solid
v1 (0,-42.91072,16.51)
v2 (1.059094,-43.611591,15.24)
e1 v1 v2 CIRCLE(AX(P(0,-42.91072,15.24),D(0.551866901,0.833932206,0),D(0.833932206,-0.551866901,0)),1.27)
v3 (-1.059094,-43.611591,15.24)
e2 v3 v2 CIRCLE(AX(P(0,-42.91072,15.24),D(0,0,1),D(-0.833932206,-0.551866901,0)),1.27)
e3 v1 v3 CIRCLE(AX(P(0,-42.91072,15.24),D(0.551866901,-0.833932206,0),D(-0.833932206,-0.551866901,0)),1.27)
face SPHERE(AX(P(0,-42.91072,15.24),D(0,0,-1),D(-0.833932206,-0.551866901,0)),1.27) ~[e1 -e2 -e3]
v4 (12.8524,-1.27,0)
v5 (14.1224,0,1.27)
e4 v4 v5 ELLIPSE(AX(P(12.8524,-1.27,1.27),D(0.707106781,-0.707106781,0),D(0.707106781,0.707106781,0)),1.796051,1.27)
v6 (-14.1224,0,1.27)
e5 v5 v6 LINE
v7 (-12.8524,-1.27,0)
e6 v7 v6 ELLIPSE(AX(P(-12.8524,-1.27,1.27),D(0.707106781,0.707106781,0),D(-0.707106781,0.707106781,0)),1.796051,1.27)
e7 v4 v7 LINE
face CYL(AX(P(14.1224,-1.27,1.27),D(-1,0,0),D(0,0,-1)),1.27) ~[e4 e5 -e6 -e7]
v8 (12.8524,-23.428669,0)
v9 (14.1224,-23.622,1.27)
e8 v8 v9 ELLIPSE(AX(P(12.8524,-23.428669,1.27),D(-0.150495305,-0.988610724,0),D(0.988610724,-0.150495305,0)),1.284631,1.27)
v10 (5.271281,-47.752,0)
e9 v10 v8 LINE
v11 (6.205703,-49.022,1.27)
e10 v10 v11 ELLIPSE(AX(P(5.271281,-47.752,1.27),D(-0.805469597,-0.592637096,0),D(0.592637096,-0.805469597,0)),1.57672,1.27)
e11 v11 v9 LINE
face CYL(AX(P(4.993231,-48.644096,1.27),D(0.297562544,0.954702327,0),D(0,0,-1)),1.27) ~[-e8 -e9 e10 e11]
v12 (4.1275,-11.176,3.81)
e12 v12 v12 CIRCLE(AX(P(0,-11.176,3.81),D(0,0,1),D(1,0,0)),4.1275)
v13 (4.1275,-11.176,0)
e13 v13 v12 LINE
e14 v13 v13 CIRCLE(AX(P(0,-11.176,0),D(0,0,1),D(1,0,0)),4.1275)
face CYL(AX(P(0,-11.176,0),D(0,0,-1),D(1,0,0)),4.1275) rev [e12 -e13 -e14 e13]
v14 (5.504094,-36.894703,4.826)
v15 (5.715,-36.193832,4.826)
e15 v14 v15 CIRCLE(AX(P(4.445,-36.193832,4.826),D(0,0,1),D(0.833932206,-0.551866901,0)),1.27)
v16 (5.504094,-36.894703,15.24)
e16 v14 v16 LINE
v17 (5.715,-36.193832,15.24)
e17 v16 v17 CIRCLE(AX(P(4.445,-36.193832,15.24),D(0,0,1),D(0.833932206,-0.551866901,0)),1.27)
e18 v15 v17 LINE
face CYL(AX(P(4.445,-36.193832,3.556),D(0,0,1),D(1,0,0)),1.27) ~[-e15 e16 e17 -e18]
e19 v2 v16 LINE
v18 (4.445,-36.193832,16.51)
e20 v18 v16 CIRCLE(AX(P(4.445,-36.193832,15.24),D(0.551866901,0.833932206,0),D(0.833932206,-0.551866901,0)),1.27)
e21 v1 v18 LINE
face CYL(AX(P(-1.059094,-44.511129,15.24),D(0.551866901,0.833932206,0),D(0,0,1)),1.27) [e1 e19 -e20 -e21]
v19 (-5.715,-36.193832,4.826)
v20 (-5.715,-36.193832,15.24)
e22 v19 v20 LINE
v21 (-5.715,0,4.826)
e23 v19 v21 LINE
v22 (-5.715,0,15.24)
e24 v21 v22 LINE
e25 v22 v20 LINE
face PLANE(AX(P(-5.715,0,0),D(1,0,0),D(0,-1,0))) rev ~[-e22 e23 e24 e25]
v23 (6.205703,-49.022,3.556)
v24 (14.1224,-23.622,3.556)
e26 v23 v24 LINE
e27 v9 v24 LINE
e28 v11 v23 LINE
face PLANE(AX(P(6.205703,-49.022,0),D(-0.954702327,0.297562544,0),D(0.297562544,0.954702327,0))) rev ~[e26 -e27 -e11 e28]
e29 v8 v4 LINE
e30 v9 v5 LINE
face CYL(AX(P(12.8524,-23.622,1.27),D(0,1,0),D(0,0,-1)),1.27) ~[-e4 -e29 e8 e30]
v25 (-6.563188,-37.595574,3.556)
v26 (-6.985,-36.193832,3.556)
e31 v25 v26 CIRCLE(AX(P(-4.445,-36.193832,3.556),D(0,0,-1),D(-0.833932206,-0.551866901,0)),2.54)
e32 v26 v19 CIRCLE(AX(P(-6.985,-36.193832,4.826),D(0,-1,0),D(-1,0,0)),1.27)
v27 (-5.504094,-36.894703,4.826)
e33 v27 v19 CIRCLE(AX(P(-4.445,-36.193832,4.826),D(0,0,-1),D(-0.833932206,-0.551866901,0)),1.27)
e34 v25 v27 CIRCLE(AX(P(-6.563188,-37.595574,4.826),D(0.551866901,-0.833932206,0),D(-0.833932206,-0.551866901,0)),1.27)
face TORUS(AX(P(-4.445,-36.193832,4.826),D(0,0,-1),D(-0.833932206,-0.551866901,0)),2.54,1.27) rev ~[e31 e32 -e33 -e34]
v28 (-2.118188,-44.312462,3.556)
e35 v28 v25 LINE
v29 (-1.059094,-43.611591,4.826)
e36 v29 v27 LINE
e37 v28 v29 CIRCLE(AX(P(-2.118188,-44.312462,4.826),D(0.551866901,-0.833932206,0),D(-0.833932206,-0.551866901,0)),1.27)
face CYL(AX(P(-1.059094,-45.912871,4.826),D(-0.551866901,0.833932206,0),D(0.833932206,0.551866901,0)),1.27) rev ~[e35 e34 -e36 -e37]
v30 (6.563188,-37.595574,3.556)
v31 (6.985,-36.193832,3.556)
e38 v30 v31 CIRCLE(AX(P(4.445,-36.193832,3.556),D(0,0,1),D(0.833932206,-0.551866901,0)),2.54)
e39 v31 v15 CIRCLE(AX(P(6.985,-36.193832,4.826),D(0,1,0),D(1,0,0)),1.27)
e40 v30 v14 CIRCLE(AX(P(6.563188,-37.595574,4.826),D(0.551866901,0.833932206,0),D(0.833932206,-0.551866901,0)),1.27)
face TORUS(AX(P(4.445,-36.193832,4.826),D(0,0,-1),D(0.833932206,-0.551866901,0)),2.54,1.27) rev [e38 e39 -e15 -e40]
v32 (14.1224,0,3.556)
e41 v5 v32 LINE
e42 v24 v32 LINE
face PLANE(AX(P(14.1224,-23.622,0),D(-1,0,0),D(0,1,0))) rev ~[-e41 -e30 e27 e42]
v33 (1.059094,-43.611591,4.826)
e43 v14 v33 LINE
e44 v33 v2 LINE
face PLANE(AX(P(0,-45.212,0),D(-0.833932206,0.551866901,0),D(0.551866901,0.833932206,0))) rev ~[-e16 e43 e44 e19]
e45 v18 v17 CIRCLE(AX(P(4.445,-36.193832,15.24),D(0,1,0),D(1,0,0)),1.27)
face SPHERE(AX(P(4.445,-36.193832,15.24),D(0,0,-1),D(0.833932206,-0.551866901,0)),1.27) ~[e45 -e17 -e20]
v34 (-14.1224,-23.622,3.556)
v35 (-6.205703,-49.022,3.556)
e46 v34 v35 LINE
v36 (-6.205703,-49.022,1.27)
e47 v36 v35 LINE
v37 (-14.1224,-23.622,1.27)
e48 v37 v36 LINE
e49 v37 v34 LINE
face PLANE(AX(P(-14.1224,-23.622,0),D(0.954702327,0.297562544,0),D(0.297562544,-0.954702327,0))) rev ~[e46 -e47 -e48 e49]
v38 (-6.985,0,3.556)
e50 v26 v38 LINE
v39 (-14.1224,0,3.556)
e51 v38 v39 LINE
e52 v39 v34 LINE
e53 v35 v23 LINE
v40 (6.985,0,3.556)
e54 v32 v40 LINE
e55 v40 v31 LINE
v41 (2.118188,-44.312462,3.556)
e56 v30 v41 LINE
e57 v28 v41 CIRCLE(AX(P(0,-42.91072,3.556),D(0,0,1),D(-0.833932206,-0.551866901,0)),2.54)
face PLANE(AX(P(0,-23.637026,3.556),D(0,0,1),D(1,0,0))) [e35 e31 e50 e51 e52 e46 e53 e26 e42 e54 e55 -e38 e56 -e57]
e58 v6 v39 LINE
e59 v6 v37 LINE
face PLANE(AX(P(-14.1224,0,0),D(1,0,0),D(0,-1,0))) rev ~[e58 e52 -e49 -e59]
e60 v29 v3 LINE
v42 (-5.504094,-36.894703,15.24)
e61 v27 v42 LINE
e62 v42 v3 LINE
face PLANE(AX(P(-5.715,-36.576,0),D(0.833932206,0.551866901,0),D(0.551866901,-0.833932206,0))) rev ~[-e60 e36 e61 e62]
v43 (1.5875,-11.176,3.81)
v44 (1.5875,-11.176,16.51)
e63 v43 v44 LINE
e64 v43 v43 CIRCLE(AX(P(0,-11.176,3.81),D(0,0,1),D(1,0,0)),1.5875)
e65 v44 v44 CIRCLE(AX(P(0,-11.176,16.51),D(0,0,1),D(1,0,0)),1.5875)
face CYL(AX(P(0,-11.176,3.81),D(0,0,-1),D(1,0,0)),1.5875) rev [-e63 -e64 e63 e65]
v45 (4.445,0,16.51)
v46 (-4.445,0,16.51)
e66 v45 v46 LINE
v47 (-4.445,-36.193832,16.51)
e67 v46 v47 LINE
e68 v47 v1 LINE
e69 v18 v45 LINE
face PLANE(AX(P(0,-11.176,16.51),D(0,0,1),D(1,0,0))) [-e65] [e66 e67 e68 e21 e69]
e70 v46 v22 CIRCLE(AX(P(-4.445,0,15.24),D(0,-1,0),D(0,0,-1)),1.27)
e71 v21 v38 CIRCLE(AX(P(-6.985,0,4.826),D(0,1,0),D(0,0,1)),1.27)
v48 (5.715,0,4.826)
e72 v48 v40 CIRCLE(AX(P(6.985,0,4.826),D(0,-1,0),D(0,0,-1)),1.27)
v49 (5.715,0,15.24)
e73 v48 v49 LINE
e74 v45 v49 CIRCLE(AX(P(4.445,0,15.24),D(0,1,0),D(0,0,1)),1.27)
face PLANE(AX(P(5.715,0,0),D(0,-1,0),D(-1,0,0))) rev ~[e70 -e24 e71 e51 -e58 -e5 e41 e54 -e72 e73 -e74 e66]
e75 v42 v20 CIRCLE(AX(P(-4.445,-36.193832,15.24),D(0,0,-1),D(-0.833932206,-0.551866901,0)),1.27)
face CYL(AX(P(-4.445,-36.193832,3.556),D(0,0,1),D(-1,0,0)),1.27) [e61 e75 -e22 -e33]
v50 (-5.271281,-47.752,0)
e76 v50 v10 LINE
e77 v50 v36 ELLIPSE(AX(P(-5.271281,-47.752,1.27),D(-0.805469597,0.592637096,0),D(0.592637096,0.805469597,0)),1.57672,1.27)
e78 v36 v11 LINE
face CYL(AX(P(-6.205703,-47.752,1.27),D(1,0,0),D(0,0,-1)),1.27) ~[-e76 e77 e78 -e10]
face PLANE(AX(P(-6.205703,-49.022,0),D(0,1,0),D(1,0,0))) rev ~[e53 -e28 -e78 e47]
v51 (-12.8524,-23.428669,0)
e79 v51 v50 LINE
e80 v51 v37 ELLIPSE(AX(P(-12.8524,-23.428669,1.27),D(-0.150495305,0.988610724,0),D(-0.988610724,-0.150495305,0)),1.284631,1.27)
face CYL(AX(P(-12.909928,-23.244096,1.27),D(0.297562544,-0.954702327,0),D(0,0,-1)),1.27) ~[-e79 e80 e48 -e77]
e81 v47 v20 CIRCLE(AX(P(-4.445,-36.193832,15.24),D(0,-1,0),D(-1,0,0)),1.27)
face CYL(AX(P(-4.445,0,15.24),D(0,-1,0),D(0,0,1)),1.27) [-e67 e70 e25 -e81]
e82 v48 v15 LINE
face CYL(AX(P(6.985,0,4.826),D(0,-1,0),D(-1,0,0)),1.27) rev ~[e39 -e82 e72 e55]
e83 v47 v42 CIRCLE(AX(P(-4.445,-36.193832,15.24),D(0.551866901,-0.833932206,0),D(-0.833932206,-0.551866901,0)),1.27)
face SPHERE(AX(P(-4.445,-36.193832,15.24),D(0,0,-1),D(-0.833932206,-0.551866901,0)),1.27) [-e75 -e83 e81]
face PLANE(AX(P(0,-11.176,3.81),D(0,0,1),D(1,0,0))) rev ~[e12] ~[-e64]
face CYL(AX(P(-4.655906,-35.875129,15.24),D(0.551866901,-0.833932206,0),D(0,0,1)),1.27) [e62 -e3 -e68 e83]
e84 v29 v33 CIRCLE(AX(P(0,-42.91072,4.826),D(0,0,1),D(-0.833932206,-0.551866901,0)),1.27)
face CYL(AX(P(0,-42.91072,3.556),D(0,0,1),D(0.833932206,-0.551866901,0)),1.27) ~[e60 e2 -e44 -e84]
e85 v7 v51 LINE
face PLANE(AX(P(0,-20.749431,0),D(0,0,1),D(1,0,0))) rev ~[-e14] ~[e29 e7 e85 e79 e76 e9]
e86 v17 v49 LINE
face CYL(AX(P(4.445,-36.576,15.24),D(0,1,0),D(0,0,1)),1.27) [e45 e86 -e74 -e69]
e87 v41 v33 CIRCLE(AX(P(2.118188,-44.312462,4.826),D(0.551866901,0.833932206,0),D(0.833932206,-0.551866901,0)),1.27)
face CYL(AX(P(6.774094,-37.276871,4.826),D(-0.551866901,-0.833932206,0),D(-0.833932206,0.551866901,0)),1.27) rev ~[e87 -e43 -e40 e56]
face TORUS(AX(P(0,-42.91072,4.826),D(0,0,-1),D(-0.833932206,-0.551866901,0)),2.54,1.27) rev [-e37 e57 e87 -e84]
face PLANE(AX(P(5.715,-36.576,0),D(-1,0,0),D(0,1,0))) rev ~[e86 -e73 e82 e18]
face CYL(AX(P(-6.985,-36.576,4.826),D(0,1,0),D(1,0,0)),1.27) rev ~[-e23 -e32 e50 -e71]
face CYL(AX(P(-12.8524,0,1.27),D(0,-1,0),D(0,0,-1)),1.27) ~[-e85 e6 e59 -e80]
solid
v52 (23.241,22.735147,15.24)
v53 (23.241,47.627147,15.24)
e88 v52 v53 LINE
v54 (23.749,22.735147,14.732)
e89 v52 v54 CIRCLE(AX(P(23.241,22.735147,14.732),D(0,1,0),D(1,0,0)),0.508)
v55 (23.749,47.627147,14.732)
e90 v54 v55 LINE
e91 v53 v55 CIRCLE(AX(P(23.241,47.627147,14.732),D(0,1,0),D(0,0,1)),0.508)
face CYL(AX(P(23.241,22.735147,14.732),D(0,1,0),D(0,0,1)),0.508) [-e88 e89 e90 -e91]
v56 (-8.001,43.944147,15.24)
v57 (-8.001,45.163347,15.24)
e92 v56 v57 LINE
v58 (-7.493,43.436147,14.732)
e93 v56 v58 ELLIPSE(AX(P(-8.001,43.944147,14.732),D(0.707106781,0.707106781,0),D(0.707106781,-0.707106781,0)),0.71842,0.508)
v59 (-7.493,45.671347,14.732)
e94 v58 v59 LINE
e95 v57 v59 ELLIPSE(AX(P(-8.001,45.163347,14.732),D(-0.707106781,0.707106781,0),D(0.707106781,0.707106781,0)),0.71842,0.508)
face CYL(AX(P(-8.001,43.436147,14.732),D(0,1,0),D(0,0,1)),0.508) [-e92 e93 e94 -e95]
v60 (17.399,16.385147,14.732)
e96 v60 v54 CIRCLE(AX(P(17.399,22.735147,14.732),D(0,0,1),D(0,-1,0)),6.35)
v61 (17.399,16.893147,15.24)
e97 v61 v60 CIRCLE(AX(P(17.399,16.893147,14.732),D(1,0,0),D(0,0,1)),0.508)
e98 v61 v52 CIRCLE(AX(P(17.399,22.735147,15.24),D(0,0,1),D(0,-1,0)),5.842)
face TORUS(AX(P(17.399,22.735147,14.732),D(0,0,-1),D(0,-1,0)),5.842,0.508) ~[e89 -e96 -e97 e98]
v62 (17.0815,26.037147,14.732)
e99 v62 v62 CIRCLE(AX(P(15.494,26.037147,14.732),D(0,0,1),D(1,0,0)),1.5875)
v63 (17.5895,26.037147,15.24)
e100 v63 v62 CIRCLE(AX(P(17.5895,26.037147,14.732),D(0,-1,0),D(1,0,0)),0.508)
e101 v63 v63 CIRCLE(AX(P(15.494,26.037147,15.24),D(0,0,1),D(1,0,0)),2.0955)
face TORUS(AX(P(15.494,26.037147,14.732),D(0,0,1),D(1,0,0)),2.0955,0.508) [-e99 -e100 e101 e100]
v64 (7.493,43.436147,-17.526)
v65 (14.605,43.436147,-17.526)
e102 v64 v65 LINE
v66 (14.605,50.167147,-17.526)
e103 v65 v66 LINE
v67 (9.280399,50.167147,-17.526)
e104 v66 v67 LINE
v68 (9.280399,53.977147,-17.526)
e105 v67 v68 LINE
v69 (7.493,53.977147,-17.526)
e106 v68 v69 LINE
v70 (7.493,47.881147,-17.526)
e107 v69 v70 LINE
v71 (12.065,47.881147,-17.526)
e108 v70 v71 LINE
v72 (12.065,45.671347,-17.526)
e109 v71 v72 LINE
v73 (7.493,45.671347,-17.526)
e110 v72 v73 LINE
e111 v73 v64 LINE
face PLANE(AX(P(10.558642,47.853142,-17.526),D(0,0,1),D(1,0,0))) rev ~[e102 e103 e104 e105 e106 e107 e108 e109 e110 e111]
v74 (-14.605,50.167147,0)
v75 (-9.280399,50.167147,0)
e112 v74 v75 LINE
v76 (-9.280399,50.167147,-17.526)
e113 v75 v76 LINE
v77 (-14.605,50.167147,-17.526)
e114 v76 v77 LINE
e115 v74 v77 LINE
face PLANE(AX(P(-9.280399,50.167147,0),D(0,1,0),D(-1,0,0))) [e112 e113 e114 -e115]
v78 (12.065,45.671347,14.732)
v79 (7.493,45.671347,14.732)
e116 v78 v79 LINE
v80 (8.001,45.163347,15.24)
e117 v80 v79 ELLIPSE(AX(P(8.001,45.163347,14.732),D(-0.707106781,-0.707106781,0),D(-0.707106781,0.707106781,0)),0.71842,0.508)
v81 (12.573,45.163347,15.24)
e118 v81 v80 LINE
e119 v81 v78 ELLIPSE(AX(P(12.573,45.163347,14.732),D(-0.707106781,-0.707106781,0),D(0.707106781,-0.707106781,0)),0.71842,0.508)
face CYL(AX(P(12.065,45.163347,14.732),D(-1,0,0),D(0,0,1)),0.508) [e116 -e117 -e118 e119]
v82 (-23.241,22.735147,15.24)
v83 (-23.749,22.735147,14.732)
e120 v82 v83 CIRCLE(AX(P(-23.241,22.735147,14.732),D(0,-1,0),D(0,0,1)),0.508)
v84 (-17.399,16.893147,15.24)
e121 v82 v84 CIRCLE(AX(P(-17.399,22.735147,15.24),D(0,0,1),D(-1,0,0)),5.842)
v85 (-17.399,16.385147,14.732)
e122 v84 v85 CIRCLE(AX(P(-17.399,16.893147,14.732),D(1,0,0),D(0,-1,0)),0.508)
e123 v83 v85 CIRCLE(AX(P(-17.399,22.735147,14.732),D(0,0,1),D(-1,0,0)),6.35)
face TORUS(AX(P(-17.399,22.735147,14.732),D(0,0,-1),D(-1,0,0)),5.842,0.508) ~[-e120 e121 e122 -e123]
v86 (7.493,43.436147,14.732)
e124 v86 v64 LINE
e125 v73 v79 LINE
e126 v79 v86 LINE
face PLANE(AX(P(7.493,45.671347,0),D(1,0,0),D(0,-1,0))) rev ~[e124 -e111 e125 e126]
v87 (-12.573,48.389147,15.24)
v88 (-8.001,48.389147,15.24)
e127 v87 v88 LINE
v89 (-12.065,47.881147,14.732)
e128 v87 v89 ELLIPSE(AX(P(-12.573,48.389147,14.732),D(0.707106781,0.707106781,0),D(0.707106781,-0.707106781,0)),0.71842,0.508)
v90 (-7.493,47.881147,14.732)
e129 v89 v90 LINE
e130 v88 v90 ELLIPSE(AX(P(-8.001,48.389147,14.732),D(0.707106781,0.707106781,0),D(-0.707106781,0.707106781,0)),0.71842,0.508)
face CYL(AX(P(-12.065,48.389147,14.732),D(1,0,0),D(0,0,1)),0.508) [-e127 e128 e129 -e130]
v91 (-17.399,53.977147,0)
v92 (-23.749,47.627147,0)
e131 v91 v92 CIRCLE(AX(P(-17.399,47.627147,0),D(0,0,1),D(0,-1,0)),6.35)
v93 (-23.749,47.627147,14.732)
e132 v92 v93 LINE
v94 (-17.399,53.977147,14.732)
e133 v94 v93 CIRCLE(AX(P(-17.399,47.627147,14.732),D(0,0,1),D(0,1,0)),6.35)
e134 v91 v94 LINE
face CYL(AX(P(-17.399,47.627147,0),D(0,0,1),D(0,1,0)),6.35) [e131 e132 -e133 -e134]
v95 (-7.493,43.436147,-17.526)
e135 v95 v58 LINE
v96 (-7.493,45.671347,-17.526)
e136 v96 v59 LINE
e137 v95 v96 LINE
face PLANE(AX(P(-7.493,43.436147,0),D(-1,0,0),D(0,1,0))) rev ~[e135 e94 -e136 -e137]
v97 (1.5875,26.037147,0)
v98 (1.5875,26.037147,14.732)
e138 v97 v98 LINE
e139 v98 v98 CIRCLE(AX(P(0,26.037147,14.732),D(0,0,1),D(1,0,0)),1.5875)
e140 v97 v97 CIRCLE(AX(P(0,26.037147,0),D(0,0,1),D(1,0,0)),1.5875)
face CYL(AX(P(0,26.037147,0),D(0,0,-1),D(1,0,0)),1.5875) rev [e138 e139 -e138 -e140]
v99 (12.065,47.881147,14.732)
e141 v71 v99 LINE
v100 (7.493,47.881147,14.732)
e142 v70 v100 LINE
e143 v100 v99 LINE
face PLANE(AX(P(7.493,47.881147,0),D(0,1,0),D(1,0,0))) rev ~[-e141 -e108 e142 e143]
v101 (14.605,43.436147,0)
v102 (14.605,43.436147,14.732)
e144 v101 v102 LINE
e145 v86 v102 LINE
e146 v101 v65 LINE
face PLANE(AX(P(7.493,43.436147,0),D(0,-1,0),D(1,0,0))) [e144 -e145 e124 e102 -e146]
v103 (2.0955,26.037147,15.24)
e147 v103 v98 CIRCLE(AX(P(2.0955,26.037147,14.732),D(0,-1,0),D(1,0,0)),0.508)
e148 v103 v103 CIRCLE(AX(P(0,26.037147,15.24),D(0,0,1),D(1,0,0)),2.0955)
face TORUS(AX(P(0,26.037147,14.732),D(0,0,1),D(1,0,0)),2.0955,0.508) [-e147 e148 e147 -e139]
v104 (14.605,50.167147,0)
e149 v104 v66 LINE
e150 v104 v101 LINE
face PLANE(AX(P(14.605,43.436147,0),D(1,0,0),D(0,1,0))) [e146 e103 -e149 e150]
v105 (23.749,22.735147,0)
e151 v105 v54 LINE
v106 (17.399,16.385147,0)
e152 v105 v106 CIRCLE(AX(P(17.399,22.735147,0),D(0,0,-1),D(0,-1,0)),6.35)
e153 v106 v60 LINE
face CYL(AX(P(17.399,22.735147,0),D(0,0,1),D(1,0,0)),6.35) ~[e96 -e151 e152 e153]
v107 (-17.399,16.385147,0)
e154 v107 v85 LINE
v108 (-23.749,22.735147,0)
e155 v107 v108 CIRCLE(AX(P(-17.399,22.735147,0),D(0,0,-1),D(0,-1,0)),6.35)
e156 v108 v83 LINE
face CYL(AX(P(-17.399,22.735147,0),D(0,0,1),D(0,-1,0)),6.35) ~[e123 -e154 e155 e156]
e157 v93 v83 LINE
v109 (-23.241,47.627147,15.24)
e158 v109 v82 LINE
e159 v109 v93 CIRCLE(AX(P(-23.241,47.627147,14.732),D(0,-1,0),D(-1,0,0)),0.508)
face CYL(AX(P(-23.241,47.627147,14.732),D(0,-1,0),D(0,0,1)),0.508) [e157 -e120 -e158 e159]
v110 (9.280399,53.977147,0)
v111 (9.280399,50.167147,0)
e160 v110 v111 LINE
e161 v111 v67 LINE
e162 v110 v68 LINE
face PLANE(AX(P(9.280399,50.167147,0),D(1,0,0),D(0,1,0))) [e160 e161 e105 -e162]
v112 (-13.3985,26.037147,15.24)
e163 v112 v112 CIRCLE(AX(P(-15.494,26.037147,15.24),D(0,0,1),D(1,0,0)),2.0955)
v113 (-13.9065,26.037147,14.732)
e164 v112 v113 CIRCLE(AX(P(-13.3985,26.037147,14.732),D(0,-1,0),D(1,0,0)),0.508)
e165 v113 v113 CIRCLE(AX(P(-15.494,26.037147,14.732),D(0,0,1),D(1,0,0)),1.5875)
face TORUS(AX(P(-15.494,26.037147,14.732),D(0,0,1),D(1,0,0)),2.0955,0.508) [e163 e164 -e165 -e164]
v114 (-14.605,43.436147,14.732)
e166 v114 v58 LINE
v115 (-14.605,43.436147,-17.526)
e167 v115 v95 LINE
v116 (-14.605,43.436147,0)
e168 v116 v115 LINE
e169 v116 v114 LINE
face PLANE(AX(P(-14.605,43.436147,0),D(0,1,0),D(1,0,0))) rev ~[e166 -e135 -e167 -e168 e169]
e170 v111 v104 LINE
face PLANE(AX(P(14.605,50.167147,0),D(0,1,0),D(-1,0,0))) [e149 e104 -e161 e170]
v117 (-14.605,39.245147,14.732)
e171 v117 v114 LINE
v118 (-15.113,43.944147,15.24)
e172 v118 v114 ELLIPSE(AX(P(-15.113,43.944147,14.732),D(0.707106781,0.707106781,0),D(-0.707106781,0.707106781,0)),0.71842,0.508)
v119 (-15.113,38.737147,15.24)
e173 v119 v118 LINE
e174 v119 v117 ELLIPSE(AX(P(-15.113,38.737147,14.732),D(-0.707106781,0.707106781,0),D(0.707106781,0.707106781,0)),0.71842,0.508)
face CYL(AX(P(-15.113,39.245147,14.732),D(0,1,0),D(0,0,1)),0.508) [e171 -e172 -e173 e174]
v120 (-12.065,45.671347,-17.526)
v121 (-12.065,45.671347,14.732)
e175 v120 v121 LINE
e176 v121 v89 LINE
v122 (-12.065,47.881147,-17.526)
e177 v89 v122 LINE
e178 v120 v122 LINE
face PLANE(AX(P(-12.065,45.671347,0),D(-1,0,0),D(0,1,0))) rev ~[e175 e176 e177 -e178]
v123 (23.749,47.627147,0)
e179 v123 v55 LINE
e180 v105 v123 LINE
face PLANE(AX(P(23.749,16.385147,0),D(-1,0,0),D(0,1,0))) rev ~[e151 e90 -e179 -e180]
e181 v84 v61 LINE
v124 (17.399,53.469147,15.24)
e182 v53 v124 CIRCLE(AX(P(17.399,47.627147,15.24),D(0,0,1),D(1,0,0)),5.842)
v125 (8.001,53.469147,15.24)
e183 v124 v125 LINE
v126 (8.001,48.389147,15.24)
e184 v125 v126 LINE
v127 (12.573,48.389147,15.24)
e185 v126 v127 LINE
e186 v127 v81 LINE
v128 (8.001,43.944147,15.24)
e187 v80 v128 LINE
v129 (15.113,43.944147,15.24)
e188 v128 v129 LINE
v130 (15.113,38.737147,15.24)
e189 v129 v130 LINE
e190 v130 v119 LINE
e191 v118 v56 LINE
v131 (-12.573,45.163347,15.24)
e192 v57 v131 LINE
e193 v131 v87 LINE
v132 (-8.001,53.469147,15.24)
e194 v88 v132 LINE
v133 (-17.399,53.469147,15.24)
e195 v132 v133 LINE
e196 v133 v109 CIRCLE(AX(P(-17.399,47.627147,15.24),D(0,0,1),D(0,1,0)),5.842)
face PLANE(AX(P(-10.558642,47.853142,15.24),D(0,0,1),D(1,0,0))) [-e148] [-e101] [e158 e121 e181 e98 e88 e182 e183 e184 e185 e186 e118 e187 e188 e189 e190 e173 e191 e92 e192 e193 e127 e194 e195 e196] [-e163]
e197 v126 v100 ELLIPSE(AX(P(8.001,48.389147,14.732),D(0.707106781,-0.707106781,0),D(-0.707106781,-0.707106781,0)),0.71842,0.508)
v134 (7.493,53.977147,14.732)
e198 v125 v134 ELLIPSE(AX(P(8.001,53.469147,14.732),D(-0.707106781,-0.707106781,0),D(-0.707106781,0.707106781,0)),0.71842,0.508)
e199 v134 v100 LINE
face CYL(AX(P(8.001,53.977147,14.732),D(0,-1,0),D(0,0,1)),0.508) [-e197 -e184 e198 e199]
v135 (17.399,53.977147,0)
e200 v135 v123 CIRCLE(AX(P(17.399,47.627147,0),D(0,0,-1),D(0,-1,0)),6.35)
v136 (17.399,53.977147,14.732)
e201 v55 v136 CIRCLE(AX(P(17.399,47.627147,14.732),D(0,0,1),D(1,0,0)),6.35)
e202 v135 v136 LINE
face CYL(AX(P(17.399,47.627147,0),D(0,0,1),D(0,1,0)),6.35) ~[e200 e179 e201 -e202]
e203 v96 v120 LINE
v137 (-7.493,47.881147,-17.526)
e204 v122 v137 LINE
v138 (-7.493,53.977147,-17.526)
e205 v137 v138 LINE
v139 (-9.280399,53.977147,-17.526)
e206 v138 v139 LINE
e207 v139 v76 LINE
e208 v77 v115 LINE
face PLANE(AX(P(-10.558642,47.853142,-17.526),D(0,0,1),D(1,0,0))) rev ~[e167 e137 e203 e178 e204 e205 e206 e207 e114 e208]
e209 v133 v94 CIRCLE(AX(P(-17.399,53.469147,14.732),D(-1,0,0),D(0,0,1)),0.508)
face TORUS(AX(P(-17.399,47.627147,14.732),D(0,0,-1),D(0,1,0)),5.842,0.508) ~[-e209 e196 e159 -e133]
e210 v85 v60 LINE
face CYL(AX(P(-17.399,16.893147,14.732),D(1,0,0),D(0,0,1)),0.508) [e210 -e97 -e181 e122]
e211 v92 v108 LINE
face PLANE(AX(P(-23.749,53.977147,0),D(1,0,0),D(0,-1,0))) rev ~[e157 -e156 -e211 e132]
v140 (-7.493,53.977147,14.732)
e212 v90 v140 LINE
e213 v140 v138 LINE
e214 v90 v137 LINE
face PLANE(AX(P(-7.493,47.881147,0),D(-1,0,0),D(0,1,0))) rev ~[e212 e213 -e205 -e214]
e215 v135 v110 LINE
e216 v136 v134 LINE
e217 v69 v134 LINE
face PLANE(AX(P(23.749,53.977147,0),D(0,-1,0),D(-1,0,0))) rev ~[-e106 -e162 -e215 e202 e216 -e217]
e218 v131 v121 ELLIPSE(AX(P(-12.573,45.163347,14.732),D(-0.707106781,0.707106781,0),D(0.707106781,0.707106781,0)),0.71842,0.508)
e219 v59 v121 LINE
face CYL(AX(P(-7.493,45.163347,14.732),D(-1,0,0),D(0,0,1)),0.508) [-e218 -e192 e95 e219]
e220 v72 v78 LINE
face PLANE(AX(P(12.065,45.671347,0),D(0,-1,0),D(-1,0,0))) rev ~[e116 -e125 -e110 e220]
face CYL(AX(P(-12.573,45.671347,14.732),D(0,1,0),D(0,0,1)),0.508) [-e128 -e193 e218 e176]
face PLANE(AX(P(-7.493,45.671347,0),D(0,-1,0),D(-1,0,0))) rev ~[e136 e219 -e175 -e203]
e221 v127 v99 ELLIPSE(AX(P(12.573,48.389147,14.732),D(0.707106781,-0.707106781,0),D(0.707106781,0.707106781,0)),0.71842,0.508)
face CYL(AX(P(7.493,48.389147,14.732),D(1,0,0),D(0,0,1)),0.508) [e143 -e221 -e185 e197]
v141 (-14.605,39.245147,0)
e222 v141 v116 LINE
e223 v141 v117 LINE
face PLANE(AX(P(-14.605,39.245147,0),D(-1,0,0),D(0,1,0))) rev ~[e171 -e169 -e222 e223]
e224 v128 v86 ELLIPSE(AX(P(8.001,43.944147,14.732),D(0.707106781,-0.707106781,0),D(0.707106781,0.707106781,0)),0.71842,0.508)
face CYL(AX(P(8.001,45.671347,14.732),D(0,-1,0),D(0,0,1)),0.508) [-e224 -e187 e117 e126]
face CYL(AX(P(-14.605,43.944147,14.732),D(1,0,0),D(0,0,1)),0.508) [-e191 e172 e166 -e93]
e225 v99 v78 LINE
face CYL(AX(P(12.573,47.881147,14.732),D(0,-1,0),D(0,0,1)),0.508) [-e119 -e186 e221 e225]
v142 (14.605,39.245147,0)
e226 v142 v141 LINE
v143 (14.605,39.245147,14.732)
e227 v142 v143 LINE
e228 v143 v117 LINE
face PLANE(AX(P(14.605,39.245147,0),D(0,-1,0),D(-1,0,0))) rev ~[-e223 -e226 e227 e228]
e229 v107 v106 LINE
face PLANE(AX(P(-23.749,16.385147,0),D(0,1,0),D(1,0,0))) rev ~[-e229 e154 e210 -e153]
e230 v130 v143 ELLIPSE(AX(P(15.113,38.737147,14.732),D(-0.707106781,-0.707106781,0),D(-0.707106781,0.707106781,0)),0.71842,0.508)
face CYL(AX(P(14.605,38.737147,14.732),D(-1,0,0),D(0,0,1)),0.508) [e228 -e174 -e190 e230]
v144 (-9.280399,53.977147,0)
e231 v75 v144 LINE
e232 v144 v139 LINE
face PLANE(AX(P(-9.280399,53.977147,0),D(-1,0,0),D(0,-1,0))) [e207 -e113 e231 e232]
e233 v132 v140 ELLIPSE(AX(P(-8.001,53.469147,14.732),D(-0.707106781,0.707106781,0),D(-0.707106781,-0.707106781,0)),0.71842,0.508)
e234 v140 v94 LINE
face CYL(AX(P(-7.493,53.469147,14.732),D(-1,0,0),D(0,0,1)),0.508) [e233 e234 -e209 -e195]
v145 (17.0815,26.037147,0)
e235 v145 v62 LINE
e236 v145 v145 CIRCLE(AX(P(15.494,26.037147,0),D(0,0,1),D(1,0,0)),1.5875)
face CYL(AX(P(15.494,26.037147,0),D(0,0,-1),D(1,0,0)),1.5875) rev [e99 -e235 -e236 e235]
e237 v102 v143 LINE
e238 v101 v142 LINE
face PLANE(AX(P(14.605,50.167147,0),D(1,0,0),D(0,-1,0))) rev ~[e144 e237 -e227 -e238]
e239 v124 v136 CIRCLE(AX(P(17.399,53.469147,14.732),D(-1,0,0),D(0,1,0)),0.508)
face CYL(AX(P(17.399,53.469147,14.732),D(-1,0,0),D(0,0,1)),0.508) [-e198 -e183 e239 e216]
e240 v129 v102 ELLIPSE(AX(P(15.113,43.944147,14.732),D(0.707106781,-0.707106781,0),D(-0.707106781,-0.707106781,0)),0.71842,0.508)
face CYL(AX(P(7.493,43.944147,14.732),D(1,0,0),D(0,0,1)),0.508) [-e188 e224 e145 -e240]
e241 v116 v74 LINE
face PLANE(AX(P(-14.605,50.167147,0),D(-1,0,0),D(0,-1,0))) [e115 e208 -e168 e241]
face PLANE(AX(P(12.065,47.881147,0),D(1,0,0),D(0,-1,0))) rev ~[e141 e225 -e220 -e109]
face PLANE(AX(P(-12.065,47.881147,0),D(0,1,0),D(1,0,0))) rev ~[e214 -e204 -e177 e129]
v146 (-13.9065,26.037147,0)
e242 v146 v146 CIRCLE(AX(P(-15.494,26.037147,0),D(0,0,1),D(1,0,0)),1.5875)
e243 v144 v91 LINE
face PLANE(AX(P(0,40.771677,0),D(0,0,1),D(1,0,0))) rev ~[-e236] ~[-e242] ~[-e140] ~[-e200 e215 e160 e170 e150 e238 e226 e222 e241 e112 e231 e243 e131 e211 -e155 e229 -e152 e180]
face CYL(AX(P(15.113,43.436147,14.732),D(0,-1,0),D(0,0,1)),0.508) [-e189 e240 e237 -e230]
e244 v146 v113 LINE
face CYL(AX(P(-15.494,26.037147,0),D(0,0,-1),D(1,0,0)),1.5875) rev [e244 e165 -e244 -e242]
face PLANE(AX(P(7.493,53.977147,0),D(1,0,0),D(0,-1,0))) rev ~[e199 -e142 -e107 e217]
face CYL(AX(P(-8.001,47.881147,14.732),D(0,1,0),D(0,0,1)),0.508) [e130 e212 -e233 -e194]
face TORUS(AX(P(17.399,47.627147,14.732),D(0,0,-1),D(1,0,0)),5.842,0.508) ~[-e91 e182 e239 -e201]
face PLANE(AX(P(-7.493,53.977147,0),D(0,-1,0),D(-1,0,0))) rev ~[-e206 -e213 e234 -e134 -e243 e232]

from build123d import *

# Parameters (mm, degrees)
F1_DEPTH      = 3.556
F0_R          = 4.1275
F2_DEPTH      = 16.51
F3_START      = 3.81
F0_R_2        = 1.5875
F3_DEPTH      = 12.7
F4_R          = 1.27
F5_R          = 1.5875
F6_DEPTH      = 15.24
F7_DEPTH      = 15.24
F8_DEPTH      = 17.526
F8_DEPTH_BACK = 15.24
F9_R          = 6.35
F10_R         = 0.508


with BuildPart() as f1:
    # F0 (on Top) → F1 (new body)
    with BuildSketch(Plane.XY):
        Polygon((-5.715, 0), (-14.1224, 0), (-14.1224, -23.622), (-6.20570345, -49.022), (6.20570345, -49.022), (14.1224, -23.622), (14.1224, 0), (5.715, 0), (5.715, -36.576), (0, -45.212), (-5.715, -36.576), align=None)
    extrude(amount=F1_DEPTH)

    # F0 (on Top) → F2 (join)
    with BuildSketch(Plane.XY):
        Polygon((5.715, 0), (-5.715, 0), (-5.715, -36.576), (0, -45.212), (5.715, -36.576), align=None)
        with Locations((0, -11.176)):
            Circle(F0_R, mode=Mode.SUBTRACT)
    extrude(amount=F2_DEPTH)

    # F0 (on Top) → F3 (join)
    with BuildSketch(Plane.XY.offset(F3_START)):
        with Locations((0, -11.176)):
            Circle(F0_R)
        with Locations((0, -11.176)):
            Circle(F0_R_2, mode=Mode.SUBTRACT)
    extrude(amount=F3_DEPTH)

    # F4
    f4_edges = [f1.edges().sort_by_distance(p)[0] for p in [
        (0, -49.022, 0),
        (10.164052, -36.322, 0),
        (14.1224, -11.811, 0),
        (0, 0, 0),
        (-14.1224, -11.811, 0),
        (-10.164052, -36.322, 0),
        (5.715, -18.288, 16.51),
        (-5.715, -18.288, 16.51),
        (-5.715, -36.576, 10.033),
        (5.715, -36.576, 10.033),
        (2.8575, -40.894, 3.556),
        (2.8575, -40.894, 16.51),
        (0, -45.212, 10.033),
        (-2.8575, -40.894, 16.51),
        (5.715, -18.288, 3.556),
        (-2.8575, -40.894, 3.556),
        (-5.715, -18.288, 3.556),
    ]]
    fillet(f4_edges, radius=F4_R)


with BuildPart() as f6:
    # F5 (on Top) → F6 (new body)
    with BuildSketch(Plane.XY):
        Polygon((-23.749, 16.3851472945), (0, 16.3851472945), (23.749, 16.3851472945), (23.749, 53.9771472945), (9.2803988042, 53.9771472945), (9.2803988042, 50.1671472945), (14.605, 50.1671472945), (17.78, 50.1671472945), (17.78, 43.4361472945), (17.78, 36.0701472945), (0, 36.0701472945), (-17.78, 36.0701472945), (-17.78, 43.4361472945), (-17.78, 50.1671472945), (-14.605, 50.1671472945), (-9.2803988042, 50.1671472945), (-9.2803988042, 53.9771472945), (-23.749, 53.9771472945), align=None)
        with Locations((-15.494, 26.0371472945)):
            Circle(F5_R, mode=Mode.SUBTRACT)
        with Locations((0, 26.0371472945)):
            Circle(F5_R, mode=Mode.SUBTRACT)
        with Locations((15.494, 26.0371472945)):
            Circle(F5_R, mode=Mode.SUBTRACT)
    extrude(amount=F6_DEPTH)

    # F5 (on Top) → F7 (join)
    with BuildSketch(Plane.XY):
        Polygon((17.78, 50.1671472945), (14.605, 50.1671472945), (14.605, 43.4361472945), (14.605, 39.2451472945), (0, 39.2451472945), (-14.605, 39.2451472945), (-14.605, 43.4361472945), (-14.605, 50.1671472945), (-17.78, 50.1671472945), (-17.78, 43.4361472945), (-17.78, 36.0701472945), (0, 36.0701472945), (17.78, 36.0701472945), (17.78, 43.4361472945), align=None)
    extrude(amount=F7_DEPTH)

    # F5 (on Top) → F8 (join, two sides)
    with BuildSketch(Plane.XY) as f8_sk:
        Polygon((-7.493, 53.9771472945), (-9.2803988042, 53.9771472945), (-9.2803988042, 50.1671472945), (-14.605, 50.1671472945), (-14.605, 43.4361472945), (-7.493, 43.4361472945), (-7.493, 45.6713472945), (-12.065, 45.6713472945), (-12.065, 47.8811472945), (-7.493, 47.8811472945), align=None)
        Polygon((9.2803988042, 50.1671472945), (9.2803988042, 53.9771472945), (7.493, 53.9771472945), (7.493, 47.8811472945), (12.065, 47.8811472945), (12.065, 45.6713472945), (7.493, 45.6713472945), (7.493, 43.4361472945), (14.605, 43.4361472945), (14.605, 50.1671472945), align=None)
    extrude(amount=-F8_DEPTH)
    extrude(f8_sk.sketch, amount=F8_DEPTH_BACK)

    # F9
    f9_edges = [f6.edges().sort_by_distance(p)[0] for p in [
        (23.749, 53.977147, 7.62),
        (23.749, 16.385147, 7.62),
        (-23.749, 53.977147, 7.62),
        (-23.749, 16.385147, 7.62),
    ]]
    fillet(f9_edges, radius=F9_R)

    # F10
    f10_edges = [f6.edges().sort_by_distance(p)[0] for p in [
        (12.446, 53.977147, 15.24),
        (21.889128, 52.117275, 15.24),
        (23.749, 35.181147, 15.24),
        (21.889128, 18.245019, 15.24),
        (0, 16.385147, 15.24),
        (-21.889128, 18.245019, 15.24),
        (-23.749, 35.181147, 15.24),
        (-21.889128, 52.117275, 15.24),
        (-14.605, 41.340647, 15.24),
        (0, 39.245147, 15.24),
        (14.605, 41.340647, 15.24),
        (11.049, 43.436147, 15.24),
        (-11.049, 43.436147, 15.24),
        (-7.493, 44.553747, 15.24),
        (-12.446, 53.977147, 15.24),
        (7.493, 50.929147, 15.24),
        (-7.493, 50.929147, 15.24),
        (9.779, 47.881147, 15.24),
        (-9.779, 47.881147, 15.24),
        (12.065, 46.776247, 15.24),
        (-12.065, 46.776247, 15.24),
        (9.779, 45.671347, 15.24),
        (-9.779, 45.671347, 15.24),
        (7.493, 44.553747, 15.24),
        (-17.0815, 26.037147, 15.24),
        (-1.5875, 26.037147, 15.24),
        (13.9065, 26.037147, 15.24),
    ]]
    fillet(f10_edges, radius=F10_R)


solid = Compound([f1.part, f6.part])
